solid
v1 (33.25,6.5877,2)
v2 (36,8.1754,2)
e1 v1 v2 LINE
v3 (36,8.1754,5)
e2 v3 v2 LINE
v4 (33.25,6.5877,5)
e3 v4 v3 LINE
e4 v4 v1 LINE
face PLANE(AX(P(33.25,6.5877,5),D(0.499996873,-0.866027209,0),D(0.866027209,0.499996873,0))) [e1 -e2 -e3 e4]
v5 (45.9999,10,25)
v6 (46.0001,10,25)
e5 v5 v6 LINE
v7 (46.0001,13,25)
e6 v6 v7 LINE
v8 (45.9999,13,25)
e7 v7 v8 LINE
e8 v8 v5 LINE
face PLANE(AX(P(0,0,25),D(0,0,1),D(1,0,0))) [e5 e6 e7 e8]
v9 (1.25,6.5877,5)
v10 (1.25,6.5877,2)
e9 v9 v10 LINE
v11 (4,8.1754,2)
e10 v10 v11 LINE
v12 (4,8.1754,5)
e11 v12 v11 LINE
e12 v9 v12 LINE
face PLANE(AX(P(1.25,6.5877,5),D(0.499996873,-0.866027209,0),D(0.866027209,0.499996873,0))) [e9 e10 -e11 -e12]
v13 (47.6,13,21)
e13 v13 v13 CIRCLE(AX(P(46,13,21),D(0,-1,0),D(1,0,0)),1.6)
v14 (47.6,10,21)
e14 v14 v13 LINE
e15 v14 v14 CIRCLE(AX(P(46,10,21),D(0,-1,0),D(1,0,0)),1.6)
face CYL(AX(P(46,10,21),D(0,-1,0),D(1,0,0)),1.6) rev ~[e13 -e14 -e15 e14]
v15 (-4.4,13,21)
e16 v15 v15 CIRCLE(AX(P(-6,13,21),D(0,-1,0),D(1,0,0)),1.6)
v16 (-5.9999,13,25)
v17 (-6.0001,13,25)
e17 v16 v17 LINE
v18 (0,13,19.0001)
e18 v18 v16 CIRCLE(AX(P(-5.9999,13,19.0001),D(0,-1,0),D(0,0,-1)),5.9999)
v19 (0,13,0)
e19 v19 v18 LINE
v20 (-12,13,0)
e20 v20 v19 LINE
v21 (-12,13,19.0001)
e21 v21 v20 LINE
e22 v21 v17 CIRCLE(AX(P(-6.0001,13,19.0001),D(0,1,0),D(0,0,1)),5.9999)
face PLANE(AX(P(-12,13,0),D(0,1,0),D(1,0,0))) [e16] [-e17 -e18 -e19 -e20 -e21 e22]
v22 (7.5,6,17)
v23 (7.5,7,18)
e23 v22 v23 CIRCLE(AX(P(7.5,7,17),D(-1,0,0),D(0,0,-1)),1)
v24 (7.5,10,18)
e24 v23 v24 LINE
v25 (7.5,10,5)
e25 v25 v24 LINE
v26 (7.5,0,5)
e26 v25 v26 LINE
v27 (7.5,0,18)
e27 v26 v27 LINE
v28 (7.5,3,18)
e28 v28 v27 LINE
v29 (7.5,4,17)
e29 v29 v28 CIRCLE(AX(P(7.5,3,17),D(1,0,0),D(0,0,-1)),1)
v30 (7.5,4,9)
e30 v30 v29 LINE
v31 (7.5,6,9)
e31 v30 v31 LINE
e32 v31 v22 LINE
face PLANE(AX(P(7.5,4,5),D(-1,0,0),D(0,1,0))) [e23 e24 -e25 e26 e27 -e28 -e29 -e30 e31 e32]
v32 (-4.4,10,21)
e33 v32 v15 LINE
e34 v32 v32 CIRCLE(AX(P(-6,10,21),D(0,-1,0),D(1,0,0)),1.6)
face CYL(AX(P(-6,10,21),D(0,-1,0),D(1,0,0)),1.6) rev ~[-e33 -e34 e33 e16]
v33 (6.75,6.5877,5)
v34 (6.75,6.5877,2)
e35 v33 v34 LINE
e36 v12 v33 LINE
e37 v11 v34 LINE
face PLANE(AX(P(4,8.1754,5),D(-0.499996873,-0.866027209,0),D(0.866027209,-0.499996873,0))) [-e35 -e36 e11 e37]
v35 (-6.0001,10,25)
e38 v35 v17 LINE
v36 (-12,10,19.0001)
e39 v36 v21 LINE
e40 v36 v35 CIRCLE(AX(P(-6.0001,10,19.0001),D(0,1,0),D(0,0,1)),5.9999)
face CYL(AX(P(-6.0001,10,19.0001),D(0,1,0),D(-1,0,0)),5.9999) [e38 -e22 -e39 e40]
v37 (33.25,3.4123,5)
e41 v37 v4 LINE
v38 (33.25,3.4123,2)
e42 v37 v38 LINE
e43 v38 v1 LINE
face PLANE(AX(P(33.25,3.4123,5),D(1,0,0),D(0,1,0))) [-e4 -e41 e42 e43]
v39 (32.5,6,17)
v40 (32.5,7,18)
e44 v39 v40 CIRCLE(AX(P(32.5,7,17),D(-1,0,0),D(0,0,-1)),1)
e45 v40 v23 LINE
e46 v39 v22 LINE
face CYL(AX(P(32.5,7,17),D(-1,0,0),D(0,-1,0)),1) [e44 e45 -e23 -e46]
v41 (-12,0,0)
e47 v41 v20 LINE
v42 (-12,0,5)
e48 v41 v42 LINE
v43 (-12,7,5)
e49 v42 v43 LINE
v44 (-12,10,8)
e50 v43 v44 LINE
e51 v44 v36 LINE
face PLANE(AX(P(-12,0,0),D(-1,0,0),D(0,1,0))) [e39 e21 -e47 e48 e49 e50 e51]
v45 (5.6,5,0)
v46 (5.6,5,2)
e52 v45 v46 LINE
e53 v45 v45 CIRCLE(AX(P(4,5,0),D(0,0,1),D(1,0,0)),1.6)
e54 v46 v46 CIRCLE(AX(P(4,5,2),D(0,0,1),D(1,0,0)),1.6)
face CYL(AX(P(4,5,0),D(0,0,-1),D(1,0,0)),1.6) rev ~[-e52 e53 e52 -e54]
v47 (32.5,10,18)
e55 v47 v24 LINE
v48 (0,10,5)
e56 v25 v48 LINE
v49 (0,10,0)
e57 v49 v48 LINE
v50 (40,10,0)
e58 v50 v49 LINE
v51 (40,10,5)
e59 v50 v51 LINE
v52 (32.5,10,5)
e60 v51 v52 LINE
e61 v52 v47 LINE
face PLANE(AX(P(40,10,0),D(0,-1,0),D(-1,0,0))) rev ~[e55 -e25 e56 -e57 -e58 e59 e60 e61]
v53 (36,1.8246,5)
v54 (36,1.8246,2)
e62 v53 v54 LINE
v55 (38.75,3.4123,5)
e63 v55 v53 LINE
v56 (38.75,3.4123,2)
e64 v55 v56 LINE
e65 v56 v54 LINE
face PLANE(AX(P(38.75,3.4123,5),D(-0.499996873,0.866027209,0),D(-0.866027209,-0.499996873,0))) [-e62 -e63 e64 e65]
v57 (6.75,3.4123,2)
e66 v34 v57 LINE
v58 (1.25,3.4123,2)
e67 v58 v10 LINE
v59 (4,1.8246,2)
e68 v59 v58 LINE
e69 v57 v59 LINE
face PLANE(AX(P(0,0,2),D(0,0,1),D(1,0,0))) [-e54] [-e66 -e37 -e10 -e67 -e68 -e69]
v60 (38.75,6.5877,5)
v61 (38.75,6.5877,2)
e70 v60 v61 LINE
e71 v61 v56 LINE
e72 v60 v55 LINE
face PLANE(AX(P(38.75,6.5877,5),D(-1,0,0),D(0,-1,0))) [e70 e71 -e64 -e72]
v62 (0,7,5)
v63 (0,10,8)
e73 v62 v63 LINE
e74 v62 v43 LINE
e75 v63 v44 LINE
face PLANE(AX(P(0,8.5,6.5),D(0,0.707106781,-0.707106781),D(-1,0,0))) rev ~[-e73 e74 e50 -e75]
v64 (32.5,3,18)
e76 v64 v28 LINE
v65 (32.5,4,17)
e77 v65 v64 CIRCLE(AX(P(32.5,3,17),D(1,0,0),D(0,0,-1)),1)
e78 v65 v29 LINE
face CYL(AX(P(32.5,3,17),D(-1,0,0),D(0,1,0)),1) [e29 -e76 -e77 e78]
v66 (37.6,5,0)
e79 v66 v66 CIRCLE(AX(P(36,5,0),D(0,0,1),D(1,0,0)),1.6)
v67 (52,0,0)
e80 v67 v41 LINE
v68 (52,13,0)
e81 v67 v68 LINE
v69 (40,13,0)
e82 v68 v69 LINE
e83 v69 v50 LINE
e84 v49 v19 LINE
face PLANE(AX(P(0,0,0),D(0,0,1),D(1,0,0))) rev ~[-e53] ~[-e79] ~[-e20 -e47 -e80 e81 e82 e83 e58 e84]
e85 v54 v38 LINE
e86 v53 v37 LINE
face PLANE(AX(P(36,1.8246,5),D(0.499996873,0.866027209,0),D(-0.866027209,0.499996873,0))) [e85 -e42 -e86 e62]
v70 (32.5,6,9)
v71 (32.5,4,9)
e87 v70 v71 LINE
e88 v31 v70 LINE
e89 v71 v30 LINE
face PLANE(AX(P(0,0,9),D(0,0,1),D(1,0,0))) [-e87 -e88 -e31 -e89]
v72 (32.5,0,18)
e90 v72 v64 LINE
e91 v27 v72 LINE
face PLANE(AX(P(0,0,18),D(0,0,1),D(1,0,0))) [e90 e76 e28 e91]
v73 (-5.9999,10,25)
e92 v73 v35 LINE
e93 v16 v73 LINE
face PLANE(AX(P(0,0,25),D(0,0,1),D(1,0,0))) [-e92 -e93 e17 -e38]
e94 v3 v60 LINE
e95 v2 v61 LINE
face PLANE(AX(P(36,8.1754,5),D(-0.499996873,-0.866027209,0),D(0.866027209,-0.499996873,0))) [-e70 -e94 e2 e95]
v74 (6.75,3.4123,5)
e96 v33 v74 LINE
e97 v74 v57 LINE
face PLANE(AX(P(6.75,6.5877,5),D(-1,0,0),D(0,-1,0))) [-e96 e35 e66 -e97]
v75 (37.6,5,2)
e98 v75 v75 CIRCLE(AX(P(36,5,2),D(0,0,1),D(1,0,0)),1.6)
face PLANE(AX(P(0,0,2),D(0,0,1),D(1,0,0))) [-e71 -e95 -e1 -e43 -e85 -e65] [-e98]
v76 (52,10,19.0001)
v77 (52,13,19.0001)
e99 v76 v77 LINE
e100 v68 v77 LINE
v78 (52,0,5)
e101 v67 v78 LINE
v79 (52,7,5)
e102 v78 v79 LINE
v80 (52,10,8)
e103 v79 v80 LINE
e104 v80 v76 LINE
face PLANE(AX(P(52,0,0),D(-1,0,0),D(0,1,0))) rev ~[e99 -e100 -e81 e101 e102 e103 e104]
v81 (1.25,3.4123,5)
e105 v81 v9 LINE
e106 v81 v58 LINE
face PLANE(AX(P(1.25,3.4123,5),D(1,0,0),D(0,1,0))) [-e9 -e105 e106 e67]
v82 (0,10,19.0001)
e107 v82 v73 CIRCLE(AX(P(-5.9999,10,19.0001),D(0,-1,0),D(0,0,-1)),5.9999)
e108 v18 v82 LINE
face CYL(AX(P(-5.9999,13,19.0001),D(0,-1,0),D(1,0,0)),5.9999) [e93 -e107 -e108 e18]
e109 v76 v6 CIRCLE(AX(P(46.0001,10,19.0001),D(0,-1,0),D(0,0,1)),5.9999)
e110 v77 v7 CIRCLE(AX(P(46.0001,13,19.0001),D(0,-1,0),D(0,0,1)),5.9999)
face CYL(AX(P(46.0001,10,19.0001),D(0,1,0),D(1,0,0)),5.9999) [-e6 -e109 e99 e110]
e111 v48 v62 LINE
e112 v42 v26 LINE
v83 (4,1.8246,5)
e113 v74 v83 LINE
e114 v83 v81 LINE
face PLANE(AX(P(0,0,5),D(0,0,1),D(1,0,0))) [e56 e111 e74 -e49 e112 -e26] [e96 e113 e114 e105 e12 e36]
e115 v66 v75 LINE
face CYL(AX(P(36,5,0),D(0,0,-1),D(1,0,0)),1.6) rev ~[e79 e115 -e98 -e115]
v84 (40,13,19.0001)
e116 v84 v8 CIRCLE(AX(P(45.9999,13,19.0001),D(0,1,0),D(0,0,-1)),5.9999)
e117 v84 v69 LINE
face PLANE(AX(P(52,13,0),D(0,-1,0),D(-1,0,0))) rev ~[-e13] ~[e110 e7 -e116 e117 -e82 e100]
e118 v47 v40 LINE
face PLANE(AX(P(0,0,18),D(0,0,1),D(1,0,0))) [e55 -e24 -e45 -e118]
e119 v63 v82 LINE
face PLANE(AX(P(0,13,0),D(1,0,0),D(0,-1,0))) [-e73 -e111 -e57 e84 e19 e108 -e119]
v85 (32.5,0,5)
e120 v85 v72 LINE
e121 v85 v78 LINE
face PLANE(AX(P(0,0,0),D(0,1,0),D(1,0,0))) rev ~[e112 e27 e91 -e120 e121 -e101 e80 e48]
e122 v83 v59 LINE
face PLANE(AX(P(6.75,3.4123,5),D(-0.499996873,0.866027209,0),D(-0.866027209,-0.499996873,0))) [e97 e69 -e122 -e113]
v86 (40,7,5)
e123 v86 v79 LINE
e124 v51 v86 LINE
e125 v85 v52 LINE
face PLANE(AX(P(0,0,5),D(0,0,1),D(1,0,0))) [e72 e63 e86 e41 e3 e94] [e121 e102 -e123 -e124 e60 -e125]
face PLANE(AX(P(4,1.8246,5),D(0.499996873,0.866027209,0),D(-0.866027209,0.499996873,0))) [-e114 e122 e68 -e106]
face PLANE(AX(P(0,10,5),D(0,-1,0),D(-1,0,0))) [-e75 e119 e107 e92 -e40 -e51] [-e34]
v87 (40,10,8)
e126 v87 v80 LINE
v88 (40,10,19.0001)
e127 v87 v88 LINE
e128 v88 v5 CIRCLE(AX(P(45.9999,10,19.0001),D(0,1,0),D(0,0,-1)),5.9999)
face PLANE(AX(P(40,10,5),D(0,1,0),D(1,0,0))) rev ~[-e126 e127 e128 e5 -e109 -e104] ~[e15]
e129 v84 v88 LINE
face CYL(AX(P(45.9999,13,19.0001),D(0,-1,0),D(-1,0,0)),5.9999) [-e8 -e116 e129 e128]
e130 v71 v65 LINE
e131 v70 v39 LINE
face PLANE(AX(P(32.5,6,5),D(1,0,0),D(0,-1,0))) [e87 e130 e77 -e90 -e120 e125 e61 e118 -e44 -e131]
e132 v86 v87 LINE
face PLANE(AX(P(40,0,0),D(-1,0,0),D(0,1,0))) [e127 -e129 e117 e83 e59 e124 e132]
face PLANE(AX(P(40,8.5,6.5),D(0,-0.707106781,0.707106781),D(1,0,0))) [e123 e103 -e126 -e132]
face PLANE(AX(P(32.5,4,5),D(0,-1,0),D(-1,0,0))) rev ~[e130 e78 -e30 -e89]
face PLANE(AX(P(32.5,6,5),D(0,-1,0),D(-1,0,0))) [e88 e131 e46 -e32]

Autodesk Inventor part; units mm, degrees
ref_plane "YZ Plane" through (0, 0, 0) normal (1, 0, 0) x (0, 1, 0)
ref_plane "XZ Plane" through (0, 0, 0) normal (0, 1, 0) x (-1, 0, 0)
ref_plane "XY Plane" through (0, 0, 0) normal (0, 0, 1) x (1, 0, 0)
sketch "Sketch1" plane through (0, 0, 0) normal (0, 0, 1) x (1, 0, 0)
  line L0 (0, 0) -> (40, 0)
  line L1 (40, 0) -> (40, 10)
  line L2 (40, 10) -> (0, 10)
  line L3 (0, 10) -> (0, 0)
  circle A0 centre (4, 5) radius 1.6
  circle A1 centre (36, 5) radius 1.6
  line L4 (0, 0) -> (-12, 0)
  line L5 (-12, 0) -> (-12, 13)
  line L6 (-12, 13) -> (0, 13)
  line L7 (0, 13) -> (0, 0)
  line L8 (40, 0) -> (52, 0)
  line L9 (52, 0) -> (52, 13)
  line L10 (52, 13) -> (40, 13)
  line L11 (40, 13) -> (40, 0)
  point P0 (0, 5)
  dimension "d0" = 40
  dimension "d1" = 10
  dimension "d22" = 3.2
  dimension "d23" = 3.2
  dimension "d24" = 4
  dimension "d25" = 4
  dimension "d43" = 12
  dimension "d44" = 12
  dimension "d45" = 13
  dimension "d46" = 13
extrude "Extrusion1" add sketch "Sketch1" along normal blind 5 contours L3 L2 L1 L0
extrude "Extrusion5" add sketch "Sketch1" along normal blind 5 contours L4 L5 L6 L7 L3 | L1 L11 L10 L9 L8
sketch "Sketch2" plane through (0, 0, 5) normal (0, 0, 1) x (1, 0, 0)
  line L0 (40, 10) -> (0, 10) projected
  line L1 (0, 0) -> (40, 0) projected
  line L2 (7.5, 10) -> (32.5, 10)
  line L3 (32.5, 10) -> (32.5, 6)
  line L4 (32.5, 6) -> (7.5, 6)
  line L5 (7.5, 6) -> (7.5, 10)
  line L6 (7.5, 0) -> (32.5, 0)
  line L7 (32.5, 0) -> (32.5, 4)
  line L8 (32.5, 4) -> (7.5, 4)
  line L9 (7.5, 4) -> (7.5, 0)
  line L10 (0, 13) -> (-12, 13) projected
  line L11 (52, 13) -> (40, 13) projected
  line L12 (-12, 13) -> (0, 13)
  line L13 (0, 13) -> (0, 10)
  line L14 (0, 10) -> (-12, 10)
  line L15 (-12, 10) -> (-12, 13)
  line L16 (52, 13) -> (40, 13)
  line L17 (40, 13) -> (40, 10)
  line L18 (40, 10) -> (52, 10)
  line L19 (52, 10) -> (52, 13)
  point P0 (20, 10)
  point P1 (20, 10)
  point P2 (20, 0)
  point P3 (20, 0)
  dimension "d14" = 25
  dimension "d15" = 25
  dimension "d31" = 2
  dimension "d32" = 4
  dimension "d33" = 4
extrude "Extrusion2" add sketch "Sketch2" along normal blind 13 contours L3 L4 L5 L0 | L9 L8 L7 L1
fillet "Fillet1" radius 1 2 edges at (20, 6, 18) (20, 4, 18)
sketch "Sketch3" plane through (0, 0, 5) normal (0, 0, 1) x (1, 0, 0)
  circle A0 centre (4, 5) radius 1.6 projected
  circle A1 centre (36, 5) radius 1.6 projected
  line L0 (6.75, 6.5877) -> (6.75, 3.4123)
  line L1 (6.75, 3.4123) -> (4, 1.8246)
  line L2 (4, 1.8246) -> (1.25, 3.4123)
  line L3 (1.25, 3.4123) -> (1.25, 6.5877)
  line L4 (1.25, 6.5877) -> (4, 8.1754)
  line L5 (4, 8.1754) -> (6.75, 6.5877)
  line L6 (33.25, 6.5877) -> (36, 8.1754)
  line L7 (36, 8.1754) -> (38.75, 6.5877)
  line L8 (38.75, 6.5877) -> (38.75, 3.4123)
  line L9 (38.75, 3.4123) -> (36, 1.8246)
  line L10 (36, 1.8246) -> (33.25, 3.4123)
  line L11 (33.25, 3.4123) -> (33.25, 6.5877)
  point P0 (0, 0)
  dimension "d39" = 5.5
  dimension "d40" = 5.5
extrude "Extrusion3" cut sketch "Sketch3" against normal blind 3
sketch "Sketch4" plane through (0, 0, 5) normal (0, 0, 1) x (1, 0, 0)
  line L0 (7.5, 6) -> (7.5, 10) projected
  line L1 (32.5, 4) -> (32.5, 0) projected
  line L2 (7.5, 6) -> (32.5, 6)
  line L3 (32.5, 6) -> (32.5, 4)
  line L4 (32.5, 4) -> (7.5, 4)
  line L5 (7.5, 4) -> (7.5, 6)
  point P0 (0, 0)
extrude "Extrusion4" add sketch "Sketch4" along normal blind 4
extrude "Extrusion7" add sketch "Sketch2" along normal blind 20 contours L13 L14 L15 L10 | L19 L18 L17 L11
sketch "Sketch5" plane through (-12, 10, 5) normal (0, -1, 0) x (1, 0, 0)
  circle A0 centre (6, 16) radius 1.6
  circle A1 centre (58, 16) radius 1.6
  line L0 (0, 20) -> (12, 20) projected
  line L1 (52, 20) -> (64, 20) projected
  point P0 (15, -5)
  point P1 (6, 20)
  point P2 (58, 20)
  dimension "d49" = 3.2
  dimension "d50" = 3.2
  dimension "d56" = 4
extrude "Extrusion6" cut sketch "Sketch5" against normal blind 5
chamfer "Chamfer2" distance 3 angle 45 2 edges at (-6, 10, 5) (46, 10, 5)
fillet "Fillet2" radius 6 4 edges at (0, 11.5, 25) (-12, 11.5, 25) (40, 11.5, 25) (52, 11.5, 25)
equation "\"d23\" = d22"
equation "\"d44\" = d43"
equation "\"d45\" = d46"
equation "\"d15\" = d14"
equation "\"d32\" = d33"
equation "\"d40\" = d39"
equation "\"d50\" = d49"
properties part number "GT2 grip v2"
